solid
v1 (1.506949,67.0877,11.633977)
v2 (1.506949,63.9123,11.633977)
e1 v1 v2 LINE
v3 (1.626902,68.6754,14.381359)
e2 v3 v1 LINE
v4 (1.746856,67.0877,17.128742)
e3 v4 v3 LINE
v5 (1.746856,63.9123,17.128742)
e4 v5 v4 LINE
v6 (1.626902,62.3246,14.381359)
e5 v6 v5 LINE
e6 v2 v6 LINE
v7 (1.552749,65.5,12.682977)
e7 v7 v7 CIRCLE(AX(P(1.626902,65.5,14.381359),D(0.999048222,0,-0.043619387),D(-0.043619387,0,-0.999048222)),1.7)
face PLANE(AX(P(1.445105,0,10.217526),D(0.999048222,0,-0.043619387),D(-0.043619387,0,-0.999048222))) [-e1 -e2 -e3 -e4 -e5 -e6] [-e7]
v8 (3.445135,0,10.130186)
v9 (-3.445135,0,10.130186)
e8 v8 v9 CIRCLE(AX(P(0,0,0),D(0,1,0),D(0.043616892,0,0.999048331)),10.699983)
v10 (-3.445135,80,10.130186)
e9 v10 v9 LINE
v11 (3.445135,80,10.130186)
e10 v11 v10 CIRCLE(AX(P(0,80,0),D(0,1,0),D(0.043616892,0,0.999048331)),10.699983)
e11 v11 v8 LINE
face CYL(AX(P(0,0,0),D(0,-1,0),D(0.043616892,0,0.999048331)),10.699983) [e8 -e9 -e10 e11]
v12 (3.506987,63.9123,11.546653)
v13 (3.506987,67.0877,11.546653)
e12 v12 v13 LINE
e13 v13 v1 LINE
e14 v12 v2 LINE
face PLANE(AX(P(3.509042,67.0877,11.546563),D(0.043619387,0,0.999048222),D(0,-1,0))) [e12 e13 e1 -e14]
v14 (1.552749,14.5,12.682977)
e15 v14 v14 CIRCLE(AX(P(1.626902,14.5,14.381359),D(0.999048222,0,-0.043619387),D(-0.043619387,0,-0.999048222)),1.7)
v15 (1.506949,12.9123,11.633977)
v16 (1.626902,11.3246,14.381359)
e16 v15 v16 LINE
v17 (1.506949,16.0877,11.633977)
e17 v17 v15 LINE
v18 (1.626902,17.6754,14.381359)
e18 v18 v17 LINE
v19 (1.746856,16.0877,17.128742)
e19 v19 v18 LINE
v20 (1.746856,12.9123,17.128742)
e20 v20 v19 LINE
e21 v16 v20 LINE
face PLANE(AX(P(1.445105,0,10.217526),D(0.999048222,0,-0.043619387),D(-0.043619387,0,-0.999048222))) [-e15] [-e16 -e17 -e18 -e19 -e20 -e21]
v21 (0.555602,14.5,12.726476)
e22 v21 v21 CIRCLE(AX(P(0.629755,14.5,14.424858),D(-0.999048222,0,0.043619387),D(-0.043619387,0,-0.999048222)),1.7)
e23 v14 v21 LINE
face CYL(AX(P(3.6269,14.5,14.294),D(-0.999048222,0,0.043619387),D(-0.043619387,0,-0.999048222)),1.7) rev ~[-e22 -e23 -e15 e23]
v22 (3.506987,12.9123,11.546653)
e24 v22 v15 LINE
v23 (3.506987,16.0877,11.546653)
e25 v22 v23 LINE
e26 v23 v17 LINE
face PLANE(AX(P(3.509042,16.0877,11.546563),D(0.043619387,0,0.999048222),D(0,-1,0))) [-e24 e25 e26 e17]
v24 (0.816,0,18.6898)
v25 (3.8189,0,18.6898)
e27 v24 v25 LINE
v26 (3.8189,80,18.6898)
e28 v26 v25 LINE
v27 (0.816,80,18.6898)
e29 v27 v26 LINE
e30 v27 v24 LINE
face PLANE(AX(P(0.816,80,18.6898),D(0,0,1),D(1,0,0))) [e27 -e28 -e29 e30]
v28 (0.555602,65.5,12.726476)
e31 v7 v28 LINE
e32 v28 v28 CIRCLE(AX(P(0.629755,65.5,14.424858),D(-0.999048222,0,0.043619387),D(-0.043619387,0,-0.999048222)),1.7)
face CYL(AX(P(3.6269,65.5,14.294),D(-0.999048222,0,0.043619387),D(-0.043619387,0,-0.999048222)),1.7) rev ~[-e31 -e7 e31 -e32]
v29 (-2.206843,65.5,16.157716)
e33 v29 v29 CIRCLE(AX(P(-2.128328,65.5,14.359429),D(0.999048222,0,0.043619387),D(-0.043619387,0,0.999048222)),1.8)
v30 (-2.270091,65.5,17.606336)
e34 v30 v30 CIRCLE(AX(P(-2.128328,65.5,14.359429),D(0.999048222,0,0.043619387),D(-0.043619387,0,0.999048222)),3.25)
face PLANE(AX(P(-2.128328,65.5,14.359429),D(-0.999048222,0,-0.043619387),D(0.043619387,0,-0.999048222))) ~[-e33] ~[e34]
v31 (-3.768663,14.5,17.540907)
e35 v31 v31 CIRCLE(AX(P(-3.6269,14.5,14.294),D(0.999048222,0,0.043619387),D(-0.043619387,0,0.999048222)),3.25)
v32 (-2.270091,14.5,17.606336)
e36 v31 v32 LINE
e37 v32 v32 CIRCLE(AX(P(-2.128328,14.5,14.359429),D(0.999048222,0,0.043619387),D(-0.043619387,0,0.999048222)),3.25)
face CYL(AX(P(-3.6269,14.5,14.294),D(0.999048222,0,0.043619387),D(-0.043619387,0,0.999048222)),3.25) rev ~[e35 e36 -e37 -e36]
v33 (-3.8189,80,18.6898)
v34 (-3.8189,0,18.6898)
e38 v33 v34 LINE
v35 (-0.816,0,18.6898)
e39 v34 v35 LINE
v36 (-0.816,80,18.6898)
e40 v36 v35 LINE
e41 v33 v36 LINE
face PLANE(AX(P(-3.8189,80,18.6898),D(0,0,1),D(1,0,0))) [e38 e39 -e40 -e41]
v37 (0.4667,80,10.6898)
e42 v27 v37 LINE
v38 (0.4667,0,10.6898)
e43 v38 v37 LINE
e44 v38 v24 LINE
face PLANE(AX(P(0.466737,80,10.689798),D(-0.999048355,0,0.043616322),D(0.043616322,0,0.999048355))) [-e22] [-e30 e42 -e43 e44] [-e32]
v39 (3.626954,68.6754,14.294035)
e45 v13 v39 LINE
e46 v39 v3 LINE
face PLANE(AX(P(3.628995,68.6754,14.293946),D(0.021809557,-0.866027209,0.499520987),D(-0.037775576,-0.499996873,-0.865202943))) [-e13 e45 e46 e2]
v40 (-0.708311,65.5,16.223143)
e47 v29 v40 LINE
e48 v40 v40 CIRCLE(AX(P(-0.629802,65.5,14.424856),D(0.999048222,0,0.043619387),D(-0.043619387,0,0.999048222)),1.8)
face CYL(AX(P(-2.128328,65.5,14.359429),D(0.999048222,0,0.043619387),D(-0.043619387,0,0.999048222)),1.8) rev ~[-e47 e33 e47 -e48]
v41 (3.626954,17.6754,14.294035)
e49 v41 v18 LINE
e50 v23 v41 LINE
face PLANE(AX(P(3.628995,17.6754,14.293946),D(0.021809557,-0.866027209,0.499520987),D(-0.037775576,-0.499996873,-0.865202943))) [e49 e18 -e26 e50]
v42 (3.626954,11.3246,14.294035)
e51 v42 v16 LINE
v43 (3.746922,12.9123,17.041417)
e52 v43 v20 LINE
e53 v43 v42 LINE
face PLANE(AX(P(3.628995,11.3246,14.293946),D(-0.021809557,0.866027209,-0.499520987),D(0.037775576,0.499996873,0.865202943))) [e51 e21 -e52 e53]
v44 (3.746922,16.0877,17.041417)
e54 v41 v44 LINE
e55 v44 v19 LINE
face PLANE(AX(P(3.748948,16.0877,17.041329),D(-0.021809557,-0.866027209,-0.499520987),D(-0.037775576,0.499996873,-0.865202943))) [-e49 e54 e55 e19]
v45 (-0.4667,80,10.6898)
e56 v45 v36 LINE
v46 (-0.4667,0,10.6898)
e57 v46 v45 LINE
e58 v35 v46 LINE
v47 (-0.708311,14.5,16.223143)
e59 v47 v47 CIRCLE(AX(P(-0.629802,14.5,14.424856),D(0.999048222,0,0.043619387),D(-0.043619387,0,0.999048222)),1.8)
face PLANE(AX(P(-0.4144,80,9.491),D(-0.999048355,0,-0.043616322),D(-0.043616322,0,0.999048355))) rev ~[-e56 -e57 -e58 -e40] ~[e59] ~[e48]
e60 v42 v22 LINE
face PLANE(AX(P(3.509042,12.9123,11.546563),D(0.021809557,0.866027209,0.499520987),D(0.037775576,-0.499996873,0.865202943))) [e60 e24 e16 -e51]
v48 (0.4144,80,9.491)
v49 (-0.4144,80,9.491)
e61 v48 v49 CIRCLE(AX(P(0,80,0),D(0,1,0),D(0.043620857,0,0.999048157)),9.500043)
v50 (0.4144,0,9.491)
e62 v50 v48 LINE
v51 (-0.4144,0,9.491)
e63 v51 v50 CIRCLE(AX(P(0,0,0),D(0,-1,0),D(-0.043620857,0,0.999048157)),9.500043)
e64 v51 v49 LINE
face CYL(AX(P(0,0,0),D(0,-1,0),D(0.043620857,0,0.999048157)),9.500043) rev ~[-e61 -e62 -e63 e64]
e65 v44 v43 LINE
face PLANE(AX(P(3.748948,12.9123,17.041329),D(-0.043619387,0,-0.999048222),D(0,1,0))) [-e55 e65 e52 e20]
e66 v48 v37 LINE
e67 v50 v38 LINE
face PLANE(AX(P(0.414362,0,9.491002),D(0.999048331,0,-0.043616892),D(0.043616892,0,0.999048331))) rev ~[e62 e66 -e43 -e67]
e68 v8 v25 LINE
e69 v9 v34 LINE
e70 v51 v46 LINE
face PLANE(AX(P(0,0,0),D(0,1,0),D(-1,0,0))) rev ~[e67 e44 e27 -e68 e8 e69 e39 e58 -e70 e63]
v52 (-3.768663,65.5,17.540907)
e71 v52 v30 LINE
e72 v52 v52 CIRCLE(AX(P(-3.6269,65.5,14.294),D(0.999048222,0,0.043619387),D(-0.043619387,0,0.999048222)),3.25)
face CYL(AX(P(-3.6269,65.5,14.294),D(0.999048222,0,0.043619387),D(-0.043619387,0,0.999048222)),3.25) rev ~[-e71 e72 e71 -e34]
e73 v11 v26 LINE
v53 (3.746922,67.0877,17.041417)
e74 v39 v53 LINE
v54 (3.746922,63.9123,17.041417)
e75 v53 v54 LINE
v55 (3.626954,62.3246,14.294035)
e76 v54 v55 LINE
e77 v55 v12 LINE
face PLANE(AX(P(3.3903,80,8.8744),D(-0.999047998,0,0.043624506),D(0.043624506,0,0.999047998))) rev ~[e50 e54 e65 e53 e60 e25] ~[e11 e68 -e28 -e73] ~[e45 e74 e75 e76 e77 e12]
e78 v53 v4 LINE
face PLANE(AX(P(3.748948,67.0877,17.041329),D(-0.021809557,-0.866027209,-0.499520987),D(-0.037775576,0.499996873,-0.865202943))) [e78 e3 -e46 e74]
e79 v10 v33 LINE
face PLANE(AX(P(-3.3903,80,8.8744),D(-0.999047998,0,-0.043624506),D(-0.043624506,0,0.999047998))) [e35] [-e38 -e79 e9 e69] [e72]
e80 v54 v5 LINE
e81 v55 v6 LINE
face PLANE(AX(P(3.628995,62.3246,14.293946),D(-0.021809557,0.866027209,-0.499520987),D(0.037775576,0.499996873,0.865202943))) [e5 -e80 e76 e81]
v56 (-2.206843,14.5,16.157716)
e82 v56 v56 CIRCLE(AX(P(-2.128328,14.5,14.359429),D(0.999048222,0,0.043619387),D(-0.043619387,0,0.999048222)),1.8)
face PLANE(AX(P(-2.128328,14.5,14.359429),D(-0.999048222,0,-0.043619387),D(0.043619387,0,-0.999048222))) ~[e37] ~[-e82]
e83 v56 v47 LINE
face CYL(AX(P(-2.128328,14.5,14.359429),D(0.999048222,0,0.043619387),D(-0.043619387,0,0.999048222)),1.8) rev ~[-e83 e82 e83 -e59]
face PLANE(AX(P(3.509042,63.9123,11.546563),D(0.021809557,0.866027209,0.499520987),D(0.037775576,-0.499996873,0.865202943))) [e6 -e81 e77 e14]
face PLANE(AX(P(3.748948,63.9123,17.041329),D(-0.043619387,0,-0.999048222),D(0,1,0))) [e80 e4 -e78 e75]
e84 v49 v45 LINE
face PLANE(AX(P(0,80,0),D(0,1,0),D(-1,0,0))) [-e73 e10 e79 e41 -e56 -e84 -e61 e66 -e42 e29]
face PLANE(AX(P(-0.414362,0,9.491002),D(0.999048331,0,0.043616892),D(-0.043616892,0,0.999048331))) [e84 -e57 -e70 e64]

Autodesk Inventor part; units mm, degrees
ref_plane "YZ Plane" through (0, 0, 0) normal (1, 0, 0) x (0, 1, 0)
ref_plane "XZ Plane" through (0, 0, 0) normal (0, 1, 0) x (-1, 0, 0)
ref_plane "XY Plane" through (0, 0, 0) normal (0, 0, 1) x (1, 0, 0)
sketch "Sketch1" plane through (0, 0, 0) normal (0, 1, 0) x (-1, 0, 0)
  arc A0 (-0.4144, 9.491) -> (0.4144, 9.491) centre (0, 0) ccw
  arc A1 (-0.4667, 10.6898) -> (0.4667, 10.6898) centre (0, 0) ccw
  line L0 (0, 0) -> (-0.4667, 10.6898)
  line L1 (0, 0) -> (0.4667, 10.6898)
  line L2 (0, 0) -> (0, 8.5605) construction
  dimension "d0" = 19
  dimension "d1" = 21.4
  dimension "d2" = 5
  dimension "d3" = 2.5
extrude "BearingSleeve" add sketch "Sketch1" along normal blind 80 contours A0 L1 A1 L0
sketch "Sketch2" plane through (0, 80, 0) normal (0, 1, 0) x (1, 0, 0)
  arc A0 (0.4144, -9.491) -> (-0.4144, -9.491) centre (0, 0) ccw projected
  line L0 (-0.4144, -9.491) -> (-0.816, -18.6898)
  line L1 (0.4144, -9.491) -> (0.816, -18.6898)
  line L2 (-0.4667, -10.6898) -> (-0.4144, -9.491) projected
  line L3 (0.4144, -9.491) -> (0.4667, -10.6898) projected
  line L4 (3.3903, -8.8744) -> (3.8189, -18.6898)
  line L5 (-3.3903, -8.8744) -> (-3.8189, -18.6898)
  line L6 (-3.8189, -18.6898) -> (-0.816, -18.6898)
  line L7 (0.816, -18.6898) -> (3.8189, -18.6898)
  dimension "d6" = 3
  dimension "d7" = 3
  dimension "d8" = 8
  dimension "d9" = 8
extrude "BearingLocks" add sketch "Sketch2" against normal up to surface (80 mm away)
sketch "Sketch3" plane through (-3.4452, 0, 10.1302) normal (-0.9990482, 0, -0.0436194) x (-0.0436194, 0, 0.9990482)
  line L0 (8.5678, 0) -> (0, 0) projected
  line L1 (0, 80) -> (8.5678, 80) projected
  line L2 (8.5678, 80) -> (8.5678, 0) projected
  point P0 (-10.2708, 0)
  point P1 (4.1678, 14.5)
  point P2 (4.1678, 65.5)
  dimension "d12" = 14.5
  dimension "d13" = 14.5
  dimension "d14" = 4.4
  dimension "d15" = 4.4
hole "Hole1" at (-3.6269, 14.5, 14.294) at (-3.6269, 65.5, 14.294) direction (0.9990482, 0, 0.0436194) diameter 3.6 end up to surface counterbore diameter 6.5 counterbore depth 1.5 clearance for "Socket Head Cap Screw" size "M3" standard "Ansi Metric M Profile"
sketch "Sketch4" plane through (3.4452, 0, 10.1302) normal (0.9990482, 0, -0.0436194) x (-0.0436194, 0, -0.9990482)
  line L0 (-8.5678, 80) -> (0, 80) projected
  line L1 (0, 0) -> (-8.5678, 0) projected
  line L2 (-8.5678, 80) -> (-8.5678, 0) projected
  point P0 (10.2708, 0)
  point P1 (-4.1678, 65.5)
  point P2 (-4.1678, 14.5)
  dimension "d23" = 14.5
  dimension "d24" = 14.5
  dimension "d25" = 4.4
  dimension "d26" = 4.4
hole "Hole2" at (3.6269, 65.5, 14.294) at (3.6269, 14.5, 14.294) direction (-0.9990482, 0, 0.0436194) diameter 3.4 depth 3 clearance for "Socket Head Cap Screw" size "M3" standard "Ansi Metric M Profile"
sketch "Sketch5" plane through (3.4452, 0, 10.1302) normal (0.9990482, 0, -0.0436194) x (-0.0436194, 0, -0.9990482)
  circle A0 centre (-4.1678, 65.5) radius 1.7 projected
  circle A1 centre (-4.1678, 14.5) radius 1.7 projected
  line L0 (0, 80) -> (0, 0) projected
  line L1 (-8.5678, 80) -> (0, 80) projected
  line L2 (-8.5678, 80) -> (-8.5678, 0) projected
  line L3 (0, 0) -> (-8.5678, 0) projected
  line L4 (-1.4178, 12.9123) -> (-4.1678, 11.3246)
  line L5 (-4.1678, 11.3246) -> (-6.9178, 12.9123)
  line L6 (-6.9178, 12.9123) -> (-6.9178, 16.0877)
  line L7 (-6.9178, 16.0877) -> (-4.1678, 17.6754)
  line L8 (-4.1678, 17.6754) -> (-1.4178, 16.0877)
  line L9 (-1.4178, 16.0877) -> (-1.4178, 12.9123)
  line L10 (-1.4178, 63.9123) -> (-4.1678, 62.3246)
  line L11 (-4.1678, 62.3246) -> (-6.9178, 63.9123)
  line L12 (-6.9178, 63.9123) -> (-6.9178, 67.0877)
  line L13 (-6.9178, 67.0877) -> (-4.1678, 68.6754)
  line L14 (-4.1678, 68.6754) -> (-1.4178, 67.0877)
  line L15 (-1.4178, 67.0877) -> (-1.4178, 63.9123)
  point P0 (10.2708, 0)
  dimension "d34" = 5.5
  dimension "d35" = 5.5
extrude "Extrusion3" cut sketch "Sketch5" against normal blind 2 contours L4 L5 L6 L7 L8 L9 | L10 L11 L12 L13 L14 L15
equation "\"d0\" = BearingOD"
equation "\"d1\" = BearingOD + BearingClampWallThickness"
equation "\"d2\" = BearingTensionGap"
equation "\"d3\" = 0.5 * BearingTensionGap"
equation "\"d4\" = EffectiveBearingLength"
equation "\"d10\" = EffectiveBearingLength"
equation "\"d12\" = 0.5 * BearingLength"
equation "\"d13\" = 0.5 * BearingLength"
equation "\"d23\" = 0.5 * BearingLength"
equation "\"d24\" = 0.5 * BearingLength"
equation "\"BearingOD\" = 19"
equation "\"NozzleDiameter\" = 0.4"
equation "\"BearingTensionGap\" = 5deg"
equation "\"BearingLength\" = 29"
equation "\"EffectiveBearingLength\" = 80"
equation "\"BearingSpacing\" = EffectiveBearingLength - 2 * BearingLength"
equation "\"BearingClampWallThickness\" = 6 * NozzleDiameter"
equation "\"BearingClampLength\" = 8"
properties part number "X-Motor P1"
